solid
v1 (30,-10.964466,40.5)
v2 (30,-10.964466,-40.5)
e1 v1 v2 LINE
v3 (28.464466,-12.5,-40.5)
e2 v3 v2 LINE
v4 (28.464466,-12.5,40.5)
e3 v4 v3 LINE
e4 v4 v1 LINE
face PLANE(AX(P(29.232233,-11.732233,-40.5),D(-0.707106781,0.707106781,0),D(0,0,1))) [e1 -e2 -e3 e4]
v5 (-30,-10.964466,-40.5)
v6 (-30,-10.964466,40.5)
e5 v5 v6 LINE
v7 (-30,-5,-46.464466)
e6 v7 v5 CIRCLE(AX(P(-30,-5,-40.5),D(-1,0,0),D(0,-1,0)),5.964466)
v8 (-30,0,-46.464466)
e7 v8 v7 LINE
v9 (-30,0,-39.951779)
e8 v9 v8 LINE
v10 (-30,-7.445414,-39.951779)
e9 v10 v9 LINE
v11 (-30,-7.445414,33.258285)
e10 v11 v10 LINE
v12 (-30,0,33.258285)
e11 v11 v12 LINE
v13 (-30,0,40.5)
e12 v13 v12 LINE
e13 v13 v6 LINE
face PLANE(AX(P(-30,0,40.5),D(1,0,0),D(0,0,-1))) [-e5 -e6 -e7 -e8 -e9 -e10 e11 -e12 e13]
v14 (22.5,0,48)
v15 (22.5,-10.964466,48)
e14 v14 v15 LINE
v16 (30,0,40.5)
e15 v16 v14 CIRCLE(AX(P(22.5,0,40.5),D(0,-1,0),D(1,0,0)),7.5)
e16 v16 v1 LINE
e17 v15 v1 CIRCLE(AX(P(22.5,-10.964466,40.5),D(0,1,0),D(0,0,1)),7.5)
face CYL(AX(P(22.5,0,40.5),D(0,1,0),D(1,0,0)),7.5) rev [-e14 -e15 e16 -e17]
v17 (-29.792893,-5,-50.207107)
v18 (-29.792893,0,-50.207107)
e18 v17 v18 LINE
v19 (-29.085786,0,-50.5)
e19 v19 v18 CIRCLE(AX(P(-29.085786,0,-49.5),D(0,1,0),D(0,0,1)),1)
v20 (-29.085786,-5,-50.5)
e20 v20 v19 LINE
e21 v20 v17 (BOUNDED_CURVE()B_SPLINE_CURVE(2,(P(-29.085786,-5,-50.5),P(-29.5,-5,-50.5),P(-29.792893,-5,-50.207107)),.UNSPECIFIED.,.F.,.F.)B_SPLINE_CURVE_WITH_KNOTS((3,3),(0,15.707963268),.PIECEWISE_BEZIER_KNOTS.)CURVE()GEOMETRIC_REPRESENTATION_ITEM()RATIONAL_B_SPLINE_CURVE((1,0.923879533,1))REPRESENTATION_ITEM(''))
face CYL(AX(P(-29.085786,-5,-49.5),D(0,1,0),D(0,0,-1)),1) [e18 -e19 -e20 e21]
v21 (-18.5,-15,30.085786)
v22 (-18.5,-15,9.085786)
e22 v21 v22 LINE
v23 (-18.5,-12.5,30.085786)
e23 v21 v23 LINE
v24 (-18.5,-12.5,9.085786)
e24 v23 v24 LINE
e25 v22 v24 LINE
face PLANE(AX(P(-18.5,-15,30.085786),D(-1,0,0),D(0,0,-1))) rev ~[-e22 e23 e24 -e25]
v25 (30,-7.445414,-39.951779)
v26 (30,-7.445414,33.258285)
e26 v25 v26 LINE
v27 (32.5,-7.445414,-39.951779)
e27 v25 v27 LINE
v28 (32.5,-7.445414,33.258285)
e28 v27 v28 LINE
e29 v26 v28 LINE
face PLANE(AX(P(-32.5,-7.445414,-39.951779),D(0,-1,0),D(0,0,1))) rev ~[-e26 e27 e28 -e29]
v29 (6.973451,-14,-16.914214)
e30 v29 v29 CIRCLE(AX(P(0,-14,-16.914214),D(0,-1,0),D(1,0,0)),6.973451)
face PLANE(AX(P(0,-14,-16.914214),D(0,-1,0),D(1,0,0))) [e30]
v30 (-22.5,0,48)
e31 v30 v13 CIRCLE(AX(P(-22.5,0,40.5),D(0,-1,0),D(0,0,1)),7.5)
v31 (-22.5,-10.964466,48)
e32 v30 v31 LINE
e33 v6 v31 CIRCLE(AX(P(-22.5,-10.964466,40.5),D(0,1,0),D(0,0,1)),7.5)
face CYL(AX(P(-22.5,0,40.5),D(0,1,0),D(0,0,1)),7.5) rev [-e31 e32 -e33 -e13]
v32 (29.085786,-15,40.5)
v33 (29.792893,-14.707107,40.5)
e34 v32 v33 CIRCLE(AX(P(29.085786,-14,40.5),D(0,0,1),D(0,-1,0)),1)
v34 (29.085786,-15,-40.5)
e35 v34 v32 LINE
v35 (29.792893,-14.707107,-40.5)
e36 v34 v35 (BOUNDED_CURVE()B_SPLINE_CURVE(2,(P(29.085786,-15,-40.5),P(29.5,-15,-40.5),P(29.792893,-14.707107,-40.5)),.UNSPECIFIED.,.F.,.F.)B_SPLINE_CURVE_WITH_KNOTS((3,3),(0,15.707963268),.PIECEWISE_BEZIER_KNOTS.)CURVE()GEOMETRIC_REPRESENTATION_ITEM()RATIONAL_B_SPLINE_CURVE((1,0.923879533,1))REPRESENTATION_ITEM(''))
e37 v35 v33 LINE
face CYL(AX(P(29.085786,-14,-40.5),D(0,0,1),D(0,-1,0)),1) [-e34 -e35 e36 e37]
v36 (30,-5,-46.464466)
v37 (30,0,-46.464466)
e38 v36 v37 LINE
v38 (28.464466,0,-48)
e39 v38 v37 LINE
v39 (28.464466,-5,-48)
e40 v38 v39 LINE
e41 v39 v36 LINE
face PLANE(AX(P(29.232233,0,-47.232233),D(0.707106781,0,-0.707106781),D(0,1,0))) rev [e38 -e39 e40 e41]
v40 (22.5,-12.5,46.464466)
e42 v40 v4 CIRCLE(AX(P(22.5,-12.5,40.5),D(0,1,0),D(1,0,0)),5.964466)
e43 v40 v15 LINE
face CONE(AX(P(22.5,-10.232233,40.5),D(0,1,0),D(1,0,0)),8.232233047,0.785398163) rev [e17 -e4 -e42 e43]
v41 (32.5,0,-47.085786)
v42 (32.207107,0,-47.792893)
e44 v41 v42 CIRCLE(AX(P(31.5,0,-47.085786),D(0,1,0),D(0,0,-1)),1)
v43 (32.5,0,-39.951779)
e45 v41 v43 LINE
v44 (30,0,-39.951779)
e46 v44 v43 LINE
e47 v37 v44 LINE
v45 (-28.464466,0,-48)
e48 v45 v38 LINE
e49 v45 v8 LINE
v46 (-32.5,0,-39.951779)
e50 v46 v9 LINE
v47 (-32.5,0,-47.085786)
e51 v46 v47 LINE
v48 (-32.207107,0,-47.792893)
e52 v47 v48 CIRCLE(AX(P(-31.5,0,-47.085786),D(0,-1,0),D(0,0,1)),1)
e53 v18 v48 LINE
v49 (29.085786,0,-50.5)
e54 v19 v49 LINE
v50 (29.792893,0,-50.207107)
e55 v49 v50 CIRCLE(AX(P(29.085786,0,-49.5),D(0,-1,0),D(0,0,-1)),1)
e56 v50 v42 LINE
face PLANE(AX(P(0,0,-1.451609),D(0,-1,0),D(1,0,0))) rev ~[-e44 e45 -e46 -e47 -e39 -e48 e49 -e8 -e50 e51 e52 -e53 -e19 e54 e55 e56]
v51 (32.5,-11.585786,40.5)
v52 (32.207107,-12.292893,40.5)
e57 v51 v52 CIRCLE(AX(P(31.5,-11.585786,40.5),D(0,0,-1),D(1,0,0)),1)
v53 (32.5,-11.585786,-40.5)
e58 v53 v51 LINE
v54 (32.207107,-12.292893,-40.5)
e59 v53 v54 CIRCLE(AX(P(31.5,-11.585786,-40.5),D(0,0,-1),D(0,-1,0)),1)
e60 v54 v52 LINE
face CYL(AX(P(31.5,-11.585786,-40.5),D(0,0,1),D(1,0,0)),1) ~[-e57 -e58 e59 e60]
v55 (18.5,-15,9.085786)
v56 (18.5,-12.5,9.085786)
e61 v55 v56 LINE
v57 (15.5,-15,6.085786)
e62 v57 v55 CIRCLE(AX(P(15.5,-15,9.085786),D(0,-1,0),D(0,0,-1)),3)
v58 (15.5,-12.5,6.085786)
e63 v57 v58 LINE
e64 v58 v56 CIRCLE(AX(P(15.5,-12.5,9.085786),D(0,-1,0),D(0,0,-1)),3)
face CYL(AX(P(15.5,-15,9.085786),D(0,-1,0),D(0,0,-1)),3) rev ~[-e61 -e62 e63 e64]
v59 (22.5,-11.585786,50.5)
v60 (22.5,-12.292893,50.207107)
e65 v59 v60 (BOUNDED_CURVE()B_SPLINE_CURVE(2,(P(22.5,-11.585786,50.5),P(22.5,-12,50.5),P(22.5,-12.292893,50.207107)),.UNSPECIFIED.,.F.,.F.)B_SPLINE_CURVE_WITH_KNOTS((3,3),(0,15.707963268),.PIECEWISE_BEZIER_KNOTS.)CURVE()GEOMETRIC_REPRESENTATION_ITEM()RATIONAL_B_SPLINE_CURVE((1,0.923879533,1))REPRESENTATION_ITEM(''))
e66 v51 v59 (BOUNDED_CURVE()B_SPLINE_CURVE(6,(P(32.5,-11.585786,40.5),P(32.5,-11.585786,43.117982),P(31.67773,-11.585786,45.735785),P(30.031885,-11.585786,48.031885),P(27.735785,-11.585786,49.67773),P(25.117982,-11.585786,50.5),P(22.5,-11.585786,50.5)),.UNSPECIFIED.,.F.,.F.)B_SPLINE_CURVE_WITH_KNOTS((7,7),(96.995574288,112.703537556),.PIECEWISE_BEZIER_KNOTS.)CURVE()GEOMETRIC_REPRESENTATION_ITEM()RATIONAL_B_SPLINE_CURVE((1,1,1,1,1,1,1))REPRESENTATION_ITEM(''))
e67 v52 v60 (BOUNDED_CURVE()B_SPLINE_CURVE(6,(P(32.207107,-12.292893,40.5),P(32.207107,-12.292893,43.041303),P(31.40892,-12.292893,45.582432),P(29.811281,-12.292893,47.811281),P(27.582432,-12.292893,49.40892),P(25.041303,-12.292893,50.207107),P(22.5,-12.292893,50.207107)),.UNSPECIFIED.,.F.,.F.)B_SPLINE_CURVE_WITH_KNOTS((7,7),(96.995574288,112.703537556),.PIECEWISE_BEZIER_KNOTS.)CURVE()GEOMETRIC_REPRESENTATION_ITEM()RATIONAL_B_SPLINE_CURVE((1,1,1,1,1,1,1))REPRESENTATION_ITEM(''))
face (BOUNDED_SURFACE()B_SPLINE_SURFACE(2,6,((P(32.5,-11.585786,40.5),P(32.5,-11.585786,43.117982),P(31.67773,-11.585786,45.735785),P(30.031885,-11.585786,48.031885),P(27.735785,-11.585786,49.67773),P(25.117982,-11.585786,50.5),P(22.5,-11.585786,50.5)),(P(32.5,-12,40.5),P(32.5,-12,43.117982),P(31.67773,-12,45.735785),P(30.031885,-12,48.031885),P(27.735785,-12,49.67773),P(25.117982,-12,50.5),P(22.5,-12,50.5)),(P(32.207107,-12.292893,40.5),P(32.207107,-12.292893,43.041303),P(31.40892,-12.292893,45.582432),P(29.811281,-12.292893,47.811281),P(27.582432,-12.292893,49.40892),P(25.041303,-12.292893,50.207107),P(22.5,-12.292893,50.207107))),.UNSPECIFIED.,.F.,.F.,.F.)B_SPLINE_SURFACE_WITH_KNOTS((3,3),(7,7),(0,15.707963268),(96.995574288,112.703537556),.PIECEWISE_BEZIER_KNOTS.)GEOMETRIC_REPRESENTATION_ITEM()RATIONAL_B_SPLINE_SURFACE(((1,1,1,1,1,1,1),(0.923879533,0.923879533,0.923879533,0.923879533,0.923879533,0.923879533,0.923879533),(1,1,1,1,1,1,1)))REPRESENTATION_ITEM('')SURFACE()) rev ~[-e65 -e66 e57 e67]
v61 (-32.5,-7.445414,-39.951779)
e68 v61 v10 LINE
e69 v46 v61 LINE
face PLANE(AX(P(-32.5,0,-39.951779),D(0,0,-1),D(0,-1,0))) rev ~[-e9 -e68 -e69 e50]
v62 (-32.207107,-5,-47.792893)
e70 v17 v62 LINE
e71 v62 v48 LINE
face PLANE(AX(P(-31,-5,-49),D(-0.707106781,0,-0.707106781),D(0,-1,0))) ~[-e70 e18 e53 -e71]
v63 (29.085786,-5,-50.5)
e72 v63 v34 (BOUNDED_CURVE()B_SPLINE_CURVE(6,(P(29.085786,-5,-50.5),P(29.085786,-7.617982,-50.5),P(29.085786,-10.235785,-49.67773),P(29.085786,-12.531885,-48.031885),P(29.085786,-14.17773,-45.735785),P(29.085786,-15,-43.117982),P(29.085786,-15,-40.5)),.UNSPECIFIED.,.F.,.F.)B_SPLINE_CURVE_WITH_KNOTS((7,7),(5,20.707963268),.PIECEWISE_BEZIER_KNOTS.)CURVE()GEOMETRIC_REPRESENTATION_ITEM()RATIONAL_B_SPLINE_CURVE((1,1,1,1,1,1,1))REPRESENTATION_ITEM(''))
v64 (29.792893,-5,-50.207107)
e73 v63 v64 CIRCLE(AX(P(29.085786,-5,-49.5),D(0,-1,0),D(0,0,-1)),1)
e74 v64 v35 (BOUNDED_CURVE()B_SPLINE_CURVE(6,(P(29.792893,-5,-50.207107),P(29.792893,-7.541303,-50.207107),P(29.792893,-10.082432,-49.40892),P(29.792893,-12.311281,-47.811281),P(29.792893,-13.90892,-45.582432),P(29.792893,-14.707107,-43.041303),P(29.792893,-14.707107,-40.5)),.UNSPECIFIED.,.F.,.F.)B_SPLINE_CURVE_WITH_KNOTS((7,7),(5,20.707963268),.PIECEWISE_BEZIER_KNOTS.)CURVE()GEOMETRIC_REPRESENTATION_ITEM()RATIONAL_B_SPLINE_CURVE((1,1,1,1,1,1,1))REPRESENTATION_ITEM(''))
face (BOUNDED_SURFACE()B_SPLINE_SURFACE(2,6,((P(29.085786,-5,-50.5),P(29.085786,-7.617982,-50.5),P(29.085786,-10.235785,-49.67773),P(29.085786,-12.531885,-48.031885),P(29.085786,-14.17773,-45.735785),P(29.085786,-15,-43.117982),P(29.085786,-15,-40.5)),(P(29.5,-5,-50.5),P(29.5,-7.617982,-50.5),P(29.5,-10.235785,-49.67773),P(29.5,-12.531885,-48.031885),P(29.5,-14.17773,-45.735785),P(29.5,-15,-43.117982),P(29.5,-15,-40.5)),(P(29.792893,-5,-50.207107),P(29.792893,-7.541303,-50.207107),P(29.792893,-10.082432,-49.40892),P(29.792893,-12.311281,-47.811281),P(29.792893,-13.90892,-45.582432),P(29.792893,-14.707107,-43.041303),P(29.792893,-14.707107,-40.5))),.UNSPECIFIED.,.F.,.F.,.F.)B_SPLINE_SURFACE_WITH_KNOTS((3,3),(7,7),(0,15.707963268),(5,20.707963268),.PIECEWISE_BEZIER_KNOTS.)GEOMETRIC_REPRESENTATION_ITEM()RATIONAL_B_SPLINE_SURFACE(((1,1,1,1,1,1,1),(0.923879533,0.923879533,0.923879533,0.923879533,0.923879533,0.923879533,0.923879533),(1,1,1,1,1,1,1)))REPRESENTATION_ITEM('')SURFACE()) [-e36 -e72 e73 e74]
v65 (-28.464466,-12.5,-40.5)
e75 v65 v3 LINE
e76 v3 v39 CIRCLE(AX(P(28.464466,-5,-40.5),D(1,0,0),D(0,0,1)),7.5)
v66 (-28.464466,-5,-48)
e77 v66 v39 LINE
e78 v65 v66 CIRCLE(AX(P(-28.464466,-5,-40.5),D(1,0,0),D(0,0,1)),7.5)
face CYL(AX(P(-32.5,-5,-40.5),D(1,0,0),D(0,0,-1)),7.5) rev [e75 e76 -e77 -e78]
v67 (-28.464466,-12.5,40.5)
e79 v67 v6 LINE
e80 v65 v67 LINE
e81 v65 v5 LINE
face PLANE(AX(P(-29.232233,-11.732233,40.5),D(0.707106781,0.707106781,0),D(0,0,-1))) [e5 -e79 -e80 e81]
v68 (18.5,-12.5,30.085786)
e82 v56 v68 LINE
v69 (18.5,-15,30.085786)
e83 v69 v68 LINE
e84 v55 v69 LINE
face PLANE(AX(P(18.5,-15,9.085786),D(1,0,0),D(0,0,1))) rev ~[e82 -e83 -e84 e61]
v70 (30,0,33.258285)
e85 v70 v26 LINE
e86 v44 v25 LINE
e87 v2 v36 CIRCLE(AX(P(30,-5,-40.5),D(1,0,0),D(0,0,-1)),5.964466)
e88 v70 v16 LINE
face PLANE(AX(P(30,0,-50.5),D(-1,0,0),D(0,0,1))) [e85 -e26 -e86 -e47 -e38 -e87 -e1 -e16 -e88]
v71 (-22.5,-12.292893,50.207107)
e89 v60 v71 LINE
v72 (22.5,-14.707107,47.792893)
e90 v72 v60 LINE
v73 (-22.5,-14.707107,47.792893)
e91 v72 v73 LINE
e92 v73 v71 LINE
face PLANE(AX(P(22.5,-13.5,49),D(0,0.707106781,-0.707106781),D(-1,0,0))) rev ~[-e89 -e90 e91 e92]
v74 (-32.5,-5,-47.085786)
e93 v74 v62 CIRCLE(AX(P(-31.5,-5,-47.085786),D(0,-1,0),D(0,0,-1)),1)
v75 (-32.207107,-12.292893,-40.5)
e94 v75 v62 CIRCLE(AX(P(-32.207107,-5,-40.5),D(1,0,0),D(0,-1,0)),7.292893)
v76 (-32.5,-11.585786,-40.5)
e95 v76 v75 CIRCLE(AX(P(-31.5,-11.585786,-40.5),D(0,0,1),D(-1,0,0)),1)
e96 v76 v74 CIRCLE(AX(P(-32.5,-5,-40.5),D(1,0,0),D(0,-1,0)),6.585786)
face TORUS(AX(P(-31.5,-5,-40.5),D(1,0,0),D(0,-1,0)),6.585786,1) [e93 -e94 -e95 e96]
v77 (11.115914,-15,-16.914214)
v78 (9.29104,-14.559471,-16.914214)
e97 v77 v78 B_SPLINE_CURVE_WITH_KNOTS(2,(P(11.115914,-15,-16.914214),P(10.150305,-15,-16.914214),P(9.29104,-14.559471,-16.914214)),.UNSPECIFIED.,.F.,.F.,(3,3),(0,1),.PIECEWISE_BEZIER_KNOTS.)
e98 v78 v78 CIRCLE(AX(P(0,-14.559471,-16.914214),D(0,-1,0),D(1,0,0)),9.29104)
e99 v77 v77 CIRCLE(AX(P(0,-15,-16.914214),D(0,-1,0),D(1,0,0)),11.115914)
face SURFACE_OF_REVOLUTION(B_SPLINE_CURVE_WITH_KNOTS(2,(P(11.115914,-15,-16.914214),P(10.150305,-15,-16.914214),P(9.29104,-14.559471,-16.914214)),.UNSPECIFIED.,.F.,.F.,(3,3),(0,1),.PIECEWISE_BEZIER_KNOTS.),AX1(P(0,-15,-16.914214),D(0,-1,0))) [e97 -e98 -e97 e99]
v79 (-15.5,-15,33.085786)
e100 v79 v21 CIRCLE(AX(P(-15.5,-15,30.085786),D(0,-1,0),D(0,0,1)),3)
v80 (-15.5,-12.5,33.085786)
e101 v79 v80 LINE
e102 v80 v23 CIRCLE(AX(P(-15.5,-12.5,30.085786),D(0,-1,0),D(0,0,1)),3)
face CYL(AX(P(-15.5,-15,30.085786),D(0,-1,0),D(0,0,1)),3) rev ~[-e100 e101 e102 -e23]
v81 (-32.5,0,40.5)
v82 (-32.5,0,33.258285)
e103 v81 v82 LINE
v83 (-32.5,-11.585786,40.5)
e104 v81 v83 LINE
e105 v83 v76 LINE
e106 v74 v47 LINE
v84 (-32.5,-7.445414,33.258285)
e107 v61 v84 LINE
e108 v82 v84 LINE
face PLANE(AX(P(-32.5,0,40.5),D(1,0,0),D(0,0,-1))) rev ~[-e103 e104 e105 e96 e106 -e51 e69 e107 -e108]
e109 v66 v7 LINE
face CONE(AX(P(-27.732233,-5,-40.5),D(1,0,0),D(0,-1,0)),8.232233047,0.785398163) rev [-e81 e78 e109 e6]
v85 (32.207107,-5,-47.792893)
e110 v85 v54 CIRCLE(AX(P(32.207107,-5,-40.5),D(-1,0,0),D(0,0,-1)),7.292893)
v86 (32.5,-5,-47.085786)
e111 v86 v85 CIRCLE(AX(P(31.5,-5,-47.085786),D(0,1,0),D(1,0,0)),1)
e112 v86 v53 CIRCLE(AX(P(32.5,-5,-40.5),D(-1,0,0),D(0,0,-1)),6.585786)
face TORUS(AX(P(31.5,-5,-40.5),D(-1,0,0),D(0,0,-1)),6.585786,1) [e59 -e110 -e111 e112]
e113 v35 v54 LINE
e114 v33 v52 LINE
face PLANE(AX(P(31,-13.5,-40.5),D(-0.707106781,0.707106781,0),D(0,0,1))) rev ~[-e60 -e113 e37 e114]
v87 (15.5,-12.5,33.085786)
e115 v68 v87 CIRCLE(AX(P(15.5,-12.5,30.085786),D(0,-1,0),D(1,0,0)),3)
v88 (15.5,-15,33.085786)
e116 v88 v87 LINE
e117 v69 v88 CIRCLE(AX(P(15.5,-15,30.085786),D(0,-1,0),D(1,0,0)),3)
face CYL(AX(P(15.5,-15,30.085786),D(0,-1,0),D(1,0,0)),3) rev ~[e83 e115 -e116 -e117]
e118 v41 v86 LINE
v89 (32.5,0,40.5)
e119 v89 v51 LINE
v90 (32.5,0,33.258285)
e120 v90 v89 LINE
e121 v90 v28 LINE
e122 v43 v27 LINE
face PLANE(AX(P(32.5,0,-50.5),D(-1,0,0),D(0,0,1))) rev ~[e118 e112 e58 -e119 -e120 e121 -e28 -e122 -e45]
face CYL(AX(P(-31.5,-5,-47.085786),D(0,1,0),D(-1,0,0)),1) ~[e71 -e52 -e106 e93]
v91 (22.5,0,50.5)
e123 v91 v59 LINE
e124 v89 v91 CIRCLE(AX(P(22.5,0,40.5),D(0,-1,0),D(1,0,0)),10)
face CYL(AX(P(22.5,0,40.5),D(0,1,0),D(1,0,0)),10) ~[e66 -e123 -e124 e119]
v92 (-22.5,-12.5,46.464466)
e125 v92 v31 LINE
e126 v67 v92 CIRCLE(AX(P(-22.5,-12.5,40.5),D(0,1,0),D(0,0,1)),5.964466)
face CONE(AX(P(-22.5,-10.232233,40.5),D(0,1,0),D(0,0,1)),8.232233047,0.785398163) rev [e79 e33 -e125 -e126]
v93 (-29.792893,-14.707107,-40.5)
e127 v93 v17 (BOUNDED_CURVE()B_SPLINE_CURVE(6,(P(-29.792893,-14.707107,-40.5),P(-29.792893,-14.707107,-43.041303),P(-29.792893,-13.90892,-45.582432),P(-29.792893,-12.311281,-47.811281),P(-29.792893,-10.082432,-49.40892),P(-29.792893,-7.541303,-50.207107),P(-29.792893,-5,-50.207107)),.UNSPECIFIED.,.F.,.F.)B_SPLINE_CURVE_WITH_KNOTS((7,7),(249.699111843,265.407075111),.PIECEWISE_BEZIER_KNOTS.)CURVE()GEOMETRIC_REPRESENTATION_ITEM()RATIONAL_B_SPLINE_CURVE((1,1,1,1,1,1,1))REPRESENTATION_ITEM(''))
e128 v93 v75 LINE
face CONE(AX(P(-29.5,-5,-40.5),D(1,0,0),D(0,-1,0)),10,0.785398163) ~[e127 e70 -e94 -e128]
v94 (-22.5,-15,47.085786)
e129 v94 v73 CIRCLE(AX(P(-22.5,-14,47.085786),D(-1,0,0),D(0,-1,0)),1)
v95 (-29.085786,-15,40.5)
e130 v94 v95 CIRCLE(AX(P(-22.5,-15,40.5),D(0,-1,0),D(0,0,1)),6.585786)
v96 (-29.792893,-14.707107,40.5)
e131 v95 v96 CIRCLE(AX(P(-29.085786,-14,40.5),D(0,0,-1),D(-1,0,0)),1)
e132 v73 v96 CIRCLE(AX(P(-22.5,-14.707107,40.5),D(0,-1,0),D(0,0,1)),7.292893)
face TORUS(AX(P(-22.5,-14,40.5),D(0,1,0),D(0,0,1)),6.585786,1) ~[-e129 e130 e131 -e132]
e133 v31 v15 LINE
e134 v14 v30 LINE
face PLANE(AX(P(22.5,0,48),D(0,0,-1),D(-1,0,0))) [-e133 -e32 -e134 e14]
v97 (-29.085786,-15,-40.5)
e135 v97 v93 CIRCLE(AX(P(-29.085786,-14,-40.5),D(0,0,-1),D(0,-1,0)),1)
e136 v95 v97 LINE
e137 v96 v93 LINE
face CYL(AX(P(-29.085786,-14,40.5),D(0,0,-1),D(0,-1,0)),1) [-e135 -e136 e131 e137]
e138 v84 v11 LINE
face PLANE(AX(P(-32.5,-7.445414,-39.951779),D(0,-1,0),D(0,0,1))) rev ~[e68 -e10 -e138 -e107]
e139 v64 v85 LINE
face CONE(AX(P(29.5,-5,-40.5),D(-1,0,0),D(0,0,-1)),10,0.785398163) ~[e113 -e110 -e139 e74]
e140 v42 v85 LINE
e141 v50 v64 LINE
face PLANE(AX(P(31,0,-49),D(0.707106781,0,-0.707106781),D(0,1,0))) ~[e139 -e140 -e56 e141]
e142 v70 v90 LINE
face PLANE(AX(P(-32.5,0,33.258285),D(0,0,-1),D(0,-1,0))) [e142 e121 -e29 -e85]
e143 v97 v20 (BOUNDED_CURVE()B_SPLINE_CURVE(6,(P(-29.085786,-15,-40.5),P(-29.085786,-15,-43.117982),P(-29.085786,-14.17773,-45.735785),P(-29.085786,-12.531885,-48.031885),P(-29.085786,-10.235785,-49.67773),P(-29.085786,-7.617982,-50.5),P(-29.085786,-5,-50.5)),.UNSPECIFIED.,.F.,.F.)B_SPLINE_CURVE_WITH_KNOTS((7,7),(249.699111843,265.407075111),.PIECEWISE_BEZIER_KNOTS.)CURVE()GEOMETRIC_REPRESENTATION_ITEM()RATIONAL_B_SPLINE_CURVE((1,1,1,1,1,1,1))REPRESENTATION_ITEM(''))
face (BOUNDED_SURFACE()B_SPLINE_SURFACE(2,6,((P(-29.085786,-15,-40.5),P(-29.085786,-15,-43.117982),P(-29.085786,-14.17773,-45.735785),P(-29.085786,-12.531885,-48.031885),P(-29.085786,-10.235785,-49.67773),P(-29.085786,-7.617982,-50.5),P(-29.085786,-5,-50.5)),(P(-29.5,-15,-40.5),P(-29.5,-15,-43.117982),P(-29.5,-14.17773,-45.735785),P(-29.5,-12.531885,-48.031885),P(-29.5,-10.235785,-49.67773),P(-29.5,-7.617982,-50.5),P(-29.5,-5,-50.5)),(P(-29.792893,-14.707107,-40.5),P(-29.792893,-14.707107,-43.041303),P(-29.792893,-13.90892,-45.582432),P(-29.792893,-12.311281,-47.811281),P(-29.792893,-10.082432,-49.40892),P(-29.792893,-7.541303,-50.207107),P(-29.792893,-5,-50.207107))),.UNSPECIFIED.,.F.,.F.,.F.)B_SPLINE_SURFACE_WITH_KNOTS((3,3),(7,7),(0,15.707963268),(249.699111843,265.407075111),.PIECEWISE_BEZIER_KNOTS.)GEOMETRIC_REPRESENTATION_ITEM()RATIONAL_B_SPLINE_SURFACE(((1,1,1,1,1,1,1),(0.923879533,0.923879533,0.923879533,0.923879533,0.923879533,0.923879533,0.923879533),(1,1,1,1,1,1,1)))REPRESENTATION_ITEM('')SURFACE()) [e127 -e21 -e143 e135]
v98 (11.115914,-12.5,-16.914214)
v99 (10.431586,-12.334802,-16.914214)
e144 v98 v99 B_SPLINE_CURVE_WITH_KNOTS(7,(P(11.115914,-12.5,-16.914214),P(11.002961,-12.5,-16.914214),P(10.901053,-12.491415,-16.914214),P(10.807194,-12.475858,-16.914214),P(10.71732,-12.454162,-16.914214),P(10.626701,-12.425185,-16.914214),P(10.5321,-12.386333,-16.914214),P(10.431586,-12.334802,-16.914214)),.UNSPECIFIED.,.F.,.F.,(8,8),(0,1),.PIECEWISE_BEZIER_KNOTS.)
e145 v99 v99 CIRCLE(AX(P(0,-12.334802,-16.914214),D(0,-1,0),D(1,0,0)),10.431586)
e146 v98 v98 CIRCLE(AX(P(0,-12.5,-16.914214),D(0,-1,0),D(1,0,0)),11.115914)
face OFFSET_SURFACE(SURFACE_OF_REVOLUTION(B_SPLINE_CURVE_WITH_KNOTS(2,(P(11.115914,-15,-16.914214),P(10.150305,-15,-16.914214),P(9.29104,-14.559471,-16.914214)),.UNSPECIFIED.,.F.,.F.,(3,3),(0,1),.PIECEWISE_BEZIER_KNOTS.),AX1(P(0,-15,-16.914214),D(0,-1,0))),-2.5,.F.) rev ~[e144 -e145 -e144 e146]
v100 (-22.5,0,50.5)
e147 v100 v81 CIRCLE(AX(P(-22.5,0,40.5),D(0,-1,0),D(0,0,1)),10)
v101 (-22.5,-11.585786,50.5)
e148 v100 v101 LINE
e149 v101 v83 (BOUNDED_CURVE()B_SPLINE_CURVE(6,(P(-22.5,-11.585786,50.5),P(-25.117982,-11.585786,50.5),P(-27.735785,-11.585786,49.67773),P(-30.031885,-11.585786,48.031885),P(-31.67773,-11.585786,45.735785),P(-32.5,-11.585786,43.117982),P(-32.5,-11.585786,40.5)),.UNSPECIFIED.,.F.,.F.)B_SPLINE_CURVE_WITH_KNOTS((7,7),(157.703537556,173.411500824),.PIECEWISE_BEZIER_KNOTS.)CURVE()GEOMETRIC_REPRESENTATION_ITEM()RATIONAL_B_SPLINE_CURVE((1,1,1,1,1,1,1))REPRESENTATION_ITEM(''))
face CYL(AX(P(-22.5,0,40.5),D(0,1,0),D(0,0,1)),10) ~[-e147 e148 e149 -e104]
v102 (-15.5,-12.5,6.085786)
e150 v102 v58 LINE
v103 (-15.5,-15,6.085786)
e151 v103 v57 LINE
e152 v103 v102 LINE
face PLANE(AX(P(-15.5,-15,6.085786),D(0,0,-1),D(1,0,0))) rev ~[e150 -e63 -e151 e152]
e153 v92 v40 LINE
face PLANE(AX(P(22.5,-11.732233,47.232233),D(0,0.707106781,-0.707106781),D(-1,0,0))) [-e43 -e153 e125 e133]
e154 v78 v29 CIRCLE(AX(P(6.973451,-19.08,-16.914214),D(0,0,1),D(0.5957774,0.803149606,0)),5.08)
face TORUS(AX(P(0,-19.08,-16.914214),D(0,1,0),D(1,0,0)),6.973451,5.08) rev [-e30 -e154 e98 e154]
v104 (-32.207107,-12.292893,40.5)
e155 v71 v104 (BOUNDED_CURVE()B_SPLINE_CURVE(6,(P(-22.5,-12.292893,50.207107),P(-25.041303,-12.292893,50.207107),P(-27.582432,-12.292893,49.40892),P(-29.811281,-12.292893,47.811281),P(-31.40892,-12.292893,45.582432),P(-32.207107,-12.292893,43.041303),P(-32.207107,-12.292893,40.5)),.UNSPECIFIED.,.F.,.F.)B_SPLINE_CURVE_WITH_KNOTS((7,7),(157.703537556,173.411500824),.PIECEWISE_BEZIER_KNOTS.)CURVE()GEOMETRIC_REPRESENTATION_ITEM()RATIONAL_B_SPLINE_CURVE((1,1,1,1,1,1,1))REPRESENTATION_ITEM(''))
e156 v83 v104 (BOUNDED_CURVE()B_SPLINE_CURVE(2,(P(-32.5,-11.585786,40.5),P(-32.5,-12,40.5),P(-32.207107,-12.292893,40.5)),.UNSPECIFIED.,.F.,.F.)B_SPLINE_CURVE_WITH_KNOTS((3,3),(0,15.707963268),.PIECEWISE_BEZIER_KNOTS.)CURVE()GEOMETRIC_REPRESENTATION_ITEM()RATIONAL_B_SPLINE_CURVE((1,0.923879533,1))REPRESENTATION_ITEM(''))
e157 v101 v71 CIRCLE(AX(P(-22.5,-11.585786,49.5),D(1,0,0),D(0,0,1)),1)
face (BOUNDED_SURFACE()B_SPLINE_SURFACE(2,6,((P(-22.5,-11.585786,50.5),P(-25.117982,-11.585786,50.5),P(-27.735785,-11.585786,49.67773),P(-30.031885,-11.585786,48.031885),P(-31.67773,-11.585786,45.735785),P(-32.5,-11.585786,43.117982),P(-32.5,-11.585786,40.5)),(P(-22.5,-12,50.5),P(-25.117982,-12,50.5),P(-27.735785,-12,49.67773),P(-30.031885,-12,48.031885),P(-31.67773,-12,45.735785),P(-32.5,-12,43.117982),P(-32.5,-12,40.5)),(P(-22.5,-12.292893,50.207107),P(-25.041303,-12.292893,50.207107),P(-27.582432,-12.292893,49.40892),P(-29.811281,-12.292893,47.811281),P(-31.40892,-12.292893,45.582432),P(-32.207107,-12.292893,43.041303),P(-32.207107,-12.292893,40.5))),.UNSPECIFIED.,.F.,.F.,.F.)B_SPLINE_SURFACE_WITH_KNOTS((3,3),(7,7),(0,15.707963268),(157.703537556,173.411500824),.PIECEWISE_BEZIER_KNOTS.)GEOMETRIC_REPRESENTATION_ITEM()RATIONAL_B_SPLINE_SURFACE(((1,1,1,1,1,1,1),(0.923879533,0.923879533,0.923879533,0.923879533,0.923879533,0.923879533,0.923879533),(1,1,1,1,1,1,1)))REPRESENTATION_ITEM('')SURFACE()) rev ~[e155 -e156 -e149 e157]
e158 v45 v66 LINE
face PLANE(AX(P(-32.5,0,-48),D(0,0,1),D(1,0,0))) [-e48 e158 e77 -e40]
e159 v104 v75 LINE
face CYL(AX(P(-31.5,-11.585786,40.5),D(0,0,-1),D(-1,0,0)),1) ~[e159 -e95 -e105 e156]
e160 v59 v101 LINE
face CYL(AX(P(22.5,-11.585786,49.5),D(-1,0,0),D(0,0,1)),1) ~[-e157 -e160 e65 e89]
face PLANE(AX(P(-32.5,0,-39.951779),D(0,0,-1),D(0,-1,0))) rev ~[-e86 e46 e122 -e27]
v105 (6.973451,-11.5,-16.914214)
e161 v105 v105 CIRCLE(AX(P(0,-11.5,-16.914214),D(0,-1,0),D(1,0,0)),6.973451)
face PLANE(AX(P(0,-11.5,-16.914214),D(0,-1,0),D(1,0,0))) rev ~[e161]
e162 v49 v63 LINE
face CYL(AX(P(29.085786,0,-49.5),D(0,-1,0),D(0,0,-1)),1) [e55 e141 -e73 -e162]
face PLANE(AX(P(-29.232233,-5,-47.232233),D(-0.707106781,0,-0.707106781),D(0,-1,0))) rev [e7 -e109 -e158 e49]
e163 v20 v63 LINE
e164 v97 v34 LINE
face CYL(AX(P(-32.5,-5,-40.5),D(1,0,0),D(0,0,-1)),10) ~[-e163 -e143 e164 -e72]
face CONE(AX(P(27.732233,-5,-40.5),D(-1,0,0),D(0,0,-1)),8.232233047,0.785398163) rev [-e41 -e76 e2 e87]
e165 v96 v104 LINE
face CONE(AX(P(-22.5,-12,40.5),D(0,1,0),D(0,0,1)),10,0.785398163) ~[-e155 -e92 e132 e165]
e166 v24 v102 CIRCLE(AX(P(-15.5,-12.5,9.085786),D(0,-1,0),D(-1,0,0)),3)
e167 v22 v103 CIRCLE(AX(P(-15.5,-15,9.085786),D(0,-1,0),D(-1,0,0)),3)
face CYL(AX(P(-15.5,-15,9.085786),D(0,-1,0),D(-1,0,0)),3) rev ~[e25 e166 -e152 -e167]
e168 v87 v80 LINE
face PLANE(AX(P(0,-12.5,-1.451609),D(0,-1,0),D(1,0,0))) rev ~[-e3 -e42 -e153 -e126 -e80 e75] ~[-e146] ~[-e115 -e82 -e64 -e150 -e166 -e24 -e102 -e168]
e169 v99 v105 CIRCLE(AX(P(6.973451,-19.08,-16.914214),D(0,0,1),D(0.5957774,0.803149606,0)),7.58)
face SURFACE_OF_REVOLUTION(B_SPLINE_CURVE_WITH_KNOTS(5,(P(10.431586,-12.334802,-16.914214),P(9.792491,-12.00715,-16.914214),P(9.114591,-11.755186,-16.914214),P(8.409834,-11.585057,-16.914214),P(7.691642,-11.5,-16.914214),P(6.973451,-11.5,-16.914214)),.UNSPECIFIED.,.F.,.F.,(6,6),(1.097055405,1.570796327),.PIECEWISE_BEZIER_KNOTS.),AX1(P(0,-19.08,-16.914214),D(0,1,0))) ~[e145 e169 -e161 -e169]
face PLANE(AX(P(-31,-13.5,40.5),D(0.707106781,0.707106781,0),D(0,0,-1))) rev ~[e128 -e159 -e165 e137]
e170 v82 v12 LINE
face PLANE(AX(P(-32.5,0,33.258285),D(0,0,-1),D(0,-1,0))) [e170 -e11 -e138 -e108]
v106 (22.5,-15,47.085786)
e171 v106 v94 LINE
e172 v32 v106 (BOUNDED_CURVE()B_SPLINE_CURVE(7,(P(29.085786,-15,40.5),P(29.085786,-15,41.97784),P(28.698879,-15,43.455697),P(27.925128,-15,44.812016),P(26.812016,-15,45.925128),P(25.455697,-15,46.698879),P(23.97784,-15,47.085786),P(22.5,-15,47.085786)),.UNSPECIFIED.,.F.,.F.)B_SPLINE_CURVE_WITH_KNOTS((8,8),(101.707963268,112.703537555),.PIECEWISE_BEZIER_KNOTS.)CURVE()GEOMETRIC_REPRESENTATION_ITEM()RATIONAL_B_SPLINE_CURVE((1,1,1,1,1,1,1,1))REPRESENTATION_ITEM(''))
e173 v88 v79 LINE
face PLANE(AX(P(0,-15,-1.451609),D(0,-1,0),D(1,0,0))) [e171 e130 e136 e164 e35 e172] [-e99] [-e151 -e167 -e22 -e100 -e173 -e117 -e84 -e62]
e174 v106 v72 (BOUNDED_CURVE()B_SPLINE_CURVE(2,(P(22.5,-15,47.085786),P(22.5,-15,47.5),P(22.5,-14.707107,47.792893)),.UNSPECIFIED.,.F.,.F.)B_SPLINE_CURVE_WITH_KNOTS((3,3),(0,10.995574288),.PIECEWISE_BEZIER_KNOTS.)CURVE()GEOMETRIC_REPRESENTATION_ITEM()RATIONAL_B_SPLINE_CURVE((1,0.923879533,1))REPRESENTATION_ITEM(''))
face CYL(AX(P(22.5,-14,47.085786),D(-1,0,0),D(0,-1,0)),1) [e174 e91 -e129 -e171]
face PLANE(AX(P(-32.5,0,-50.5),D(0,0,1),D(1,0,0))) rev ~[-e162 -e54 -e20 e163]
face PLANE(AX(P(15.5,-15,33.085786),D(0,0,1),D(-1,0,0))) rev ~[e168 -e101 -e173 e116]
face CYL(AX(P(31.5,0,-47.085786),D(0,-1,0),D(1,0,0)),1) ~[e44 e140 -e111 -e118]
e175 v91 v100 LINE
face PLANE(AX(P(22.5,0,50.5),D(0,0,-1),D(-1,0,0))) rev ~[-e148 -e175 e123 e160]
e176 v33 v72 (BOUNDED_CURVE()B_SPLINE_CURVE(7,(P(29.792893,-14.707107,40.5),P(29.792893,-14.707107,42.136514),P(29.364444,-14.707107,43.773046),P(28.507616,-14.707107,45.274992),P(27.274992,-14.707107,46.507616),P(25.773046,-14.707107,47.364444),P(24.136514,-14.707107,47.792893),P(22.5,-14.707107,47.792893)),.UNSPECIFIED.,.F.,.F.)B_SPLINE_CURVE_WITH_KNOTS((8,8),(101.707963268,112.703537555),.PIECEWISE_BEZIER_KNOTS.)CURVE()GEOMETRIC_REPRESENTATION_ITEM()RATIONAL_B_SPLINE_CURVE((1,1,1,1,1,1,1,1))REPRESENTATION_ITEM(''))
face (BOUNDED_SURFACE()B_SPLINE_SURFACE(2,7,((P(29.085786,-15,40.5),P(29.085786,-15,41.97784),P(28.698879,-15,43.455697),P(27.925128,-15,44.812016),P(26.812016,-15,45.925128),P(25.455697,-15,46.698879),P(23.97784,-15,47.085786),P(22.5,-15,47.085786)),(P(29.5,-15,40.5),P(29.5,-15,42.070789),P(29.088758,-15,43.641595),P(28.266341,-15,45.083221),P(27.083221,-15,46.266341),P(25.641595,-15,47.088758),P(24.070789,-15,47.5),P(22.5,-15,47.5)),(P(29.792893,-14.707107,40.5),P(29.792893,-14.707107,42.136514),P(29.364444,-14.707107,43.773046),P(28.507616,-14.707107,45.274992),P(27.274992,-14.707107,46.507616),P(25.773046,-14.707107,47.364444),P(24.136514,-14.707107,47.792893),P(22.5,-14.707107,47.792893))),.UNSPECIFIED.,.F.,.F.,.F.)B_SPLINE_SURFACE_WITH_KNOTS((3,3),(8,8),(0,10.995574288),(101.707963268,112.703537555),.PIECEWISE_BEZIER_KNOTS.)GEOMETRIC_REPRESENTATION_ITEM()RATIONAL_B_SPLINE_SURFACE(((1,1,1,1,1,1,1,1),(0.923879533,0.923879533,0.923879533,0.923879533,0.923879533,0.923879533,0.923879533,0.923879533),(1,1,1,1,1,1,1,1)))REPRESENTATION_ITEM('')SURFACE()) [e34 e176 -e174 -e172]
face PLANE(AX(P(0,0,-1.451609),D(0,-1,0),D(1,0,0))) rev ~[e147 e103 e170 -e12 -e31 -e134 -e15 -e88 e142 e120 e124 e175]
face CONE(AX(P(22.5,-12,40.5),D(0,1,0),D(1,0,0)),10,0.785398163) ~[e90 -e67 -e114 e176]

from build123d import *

# Parameters (mm, degrees)
F1_DEPTH  = 15
F2_R      = 10
F3_SIZE   = 3
F4_R      = 1
F6_DEPTH  = 25.4
F7_R      = 10
F8_DEPTH  = 1
F11_T     = -2.5
F12_W     = 7.4454136193
F12_H     = 73.2100643218
F3_FACE_W = 3.4142135624
F3_FACE_H = 81
F13_DEPTH = 81.8


# Not quite as in the source:
# - a fillet or chamfer that OpenCascade refuses, or shapes differently, is made with other operations: its cross-section is extruded or revolved along the edge and cut away or added


with BuildPart() as f1:
    # F0 (on Front) → F1 (new body)
    with BuildSketch(Plane.XZ):
        with BuildLine():
            Line((22.5, 50.5), (-22.5, 50.5))
            ThreePointArc((-22.5, 50.5), (-29.5710678119, 47.5710678119), (-32.5, 40.5))
            Line((-32.5, 40.5), (-32.5, -50.5))
            Line((-32.5, -50.5), (32.5, -50.5))
            Line((32.5, -50.5), (32.5, 40.5))
            ThreePointArc((32.5, 40.5), (29.5710678119, 47.5710678119), (22.5, 50.5))
        make_face()
    extrude(amount=F1_DEPTH)

    # F2
    f2_edges = [f1.edges().sort_by_distance(p)[0] for p in [
        (0, -15, -50.5),
    ]]
    fillet(f2_edges, radius=F2_R)

    # F3
    f3_edges = [f1.edges().sort_by_distance(p)[0] for p in [
        (32.5, -15, 0),
        (-32.5, -2.5, -50.5),
        (-32.5, -12.071068, -47.571068),
        (-32.5, -15, 0),
        (32.5, -2.5, -50.5),
        (32.5, -12.071068, -47.571068),
        (-29.571068, -15, 47.571068),
        (0, -15, 50.5),
        (29.571068, -15, 47.571068),
    ]]
    chamfer(f3_edges, length=F3_SIZE)

    # F4
    f4_edges = [f1.edges().sort_by_distance(p)[0] for p in [
        (32.5, -12, 0),
        (-32.5, -12, 0),
        (29.5, -15, 0),
        (-32.5, -2.5, -47.5),
        (-32.5, -9.949747, -45.449747),
        (-29.5, -2.5, -50.5),
        (-29.571068, -12, 47.571068),
        (-29.5, -12.071068, -47.571068),
        (-29.5, -15, 0),
        (29.5, -2.5, -50.5),
        (0, -12, 50.5),
        (32.5, -2.5, -47.5),
        (29.571068, -12, 47.571068),
        (32.5, -9.949747, -45.449747),
        (-27.449747, -15, 45.449747),
        (29.5, -12.071068, -47.571068),
        (27.449747, -15, 45.449747),
        (0, -15, 47.5),
    ]]
    fillet(f4_edges, radius=F4_R)

    # F5 (on face) → F6 (cut)
    with BuildSketch(Plane.XZ.offset(15)):
        with BuildLine():
            Line((15.5, 33.0857864376), (-15.5, 33.0857864376))
            ThreePointArc((-15.5, 33.0857864376), (-17.6213203436, 32.2071067812), (-18.5, 30.0857864376))
            Line((-18.5, 30.0857864376), (-18.5, 9.0857864376))
            ThreePointArc((-18.5, 9.0857864376), (-17.6213203436, 6.9644660941), (-15.5, 6.0857864376))
            Line((-15.5, 6.0857864376), (15.5, 6.0857864376))
            ThreePointArc((15.5, 6.0857864376), (17.6213203436, 6.9644660941), (18.5, 9.0857864376))
            Line((18.5, 9.0857864376), (18.5, 30.0857864376))
            ThreePointArc((18.5, 30.0857864376), (17.6213203436, 32.2071067812), (15.5, 33.0857864376))
        make_face()
    extrude(amount=-F6_DEPTH, mode=Mode.SUBTRACT)

    # F7 (on face) → F8 (cut)
    with BuildSketch(Plane.XZ.offset(15)):
        with Locations((0, -16.9142135624)):
            Circle(F7_R)
    extrude(amount=-F8_DEPTH, mode=Mode.SUBTRACT)

    # F9: fillet of radius 5.08 on 1 edges, made by hand

    # F9_s1 → F9_t2 (revolve)
    with BuildSketch(Plane.XY.offset(-16.9142135624)):
        with BuildLine():
            ThreePointArc((10, -15), (8.567188555, -14.2564743185), (6.9734508099, -14))
            Line((6.9734508099, -14), (10, -14))
            Line((10, -14), (10, -15))
        make_face()
    revolve(axis=Axis((0, -14, -16.9142135624), (0, -1, 0)))

    # F10: fillet of radius 4 on 1 edges, made by hand

    # F10_s1 → F10_t2 (revolve, cut)
    with BuildSketch(Plane.XY.offset(-16.9142135624)):
        with BuildLine():
            add(Edge.make_bspline(
                [(11.1159138454, -15), (10.1503047462, -15), (9.2910402615, -14.5594713656)],
                knots=[0, 0, 0, 1, 1, 1], degree=2, weights=[1, 1, 1]))
            ThreePointArc((9.2910402615, -14.5594713656), (9.6545831872, -14.7651501561), (10, -15))
            Line((10, -15), (11.1159138454, -15))
        make_face()
    revolve(axis=Axis((0, -15, -16.9142135624), (0, -1, 0)), mode=Mode.SUBTRACT)

    # F11
    f11_openings = [f1.faces().sort_by_distance(p)[0] for p in [
        (18.5, -7.5, 19.585786),
        (17.62132, -7.5, 32.207107),
        (0, -7.5, 33.085786),
        (-17.62132, -7.5, 32.207107),
        (-18.5, -7.5, 19.585786),
        (-17.62132, -7.5, 6.964466),
        (0, -7.5, 6.085786),
        (17.62132, -7.5, 6.964466),
        (0, 0, -3.809825),
    ]]
    offset(amount=F11_T, openings=f11_openings)

    # F12 (on face) + F3_face (on face) → F13 (cut)
    with BuildSketch(Plane(origin=(-32.5, 0, 0), x_dir=(0, -1, 0), z_dir=(-1, 0, 0))):
        with Locations((3.7227068096, -3.3467467874)):
            Rectangle(F12_W, F12_H)
    with BuildSketch(Plane(origin=(31, -13.5, 0), x_dir=(0.7071067812, 0.7071067812, 0), z_dir=(0.7071067812, -0.7071067812, 0))):
        Rectangle(F3_FACE_W, F3_FACE_H)
    extrude(amount=-F13_DEPTH, dir=(-1, 0, 0), mode=Mode.SUBTRACT)


solid = f1.part
